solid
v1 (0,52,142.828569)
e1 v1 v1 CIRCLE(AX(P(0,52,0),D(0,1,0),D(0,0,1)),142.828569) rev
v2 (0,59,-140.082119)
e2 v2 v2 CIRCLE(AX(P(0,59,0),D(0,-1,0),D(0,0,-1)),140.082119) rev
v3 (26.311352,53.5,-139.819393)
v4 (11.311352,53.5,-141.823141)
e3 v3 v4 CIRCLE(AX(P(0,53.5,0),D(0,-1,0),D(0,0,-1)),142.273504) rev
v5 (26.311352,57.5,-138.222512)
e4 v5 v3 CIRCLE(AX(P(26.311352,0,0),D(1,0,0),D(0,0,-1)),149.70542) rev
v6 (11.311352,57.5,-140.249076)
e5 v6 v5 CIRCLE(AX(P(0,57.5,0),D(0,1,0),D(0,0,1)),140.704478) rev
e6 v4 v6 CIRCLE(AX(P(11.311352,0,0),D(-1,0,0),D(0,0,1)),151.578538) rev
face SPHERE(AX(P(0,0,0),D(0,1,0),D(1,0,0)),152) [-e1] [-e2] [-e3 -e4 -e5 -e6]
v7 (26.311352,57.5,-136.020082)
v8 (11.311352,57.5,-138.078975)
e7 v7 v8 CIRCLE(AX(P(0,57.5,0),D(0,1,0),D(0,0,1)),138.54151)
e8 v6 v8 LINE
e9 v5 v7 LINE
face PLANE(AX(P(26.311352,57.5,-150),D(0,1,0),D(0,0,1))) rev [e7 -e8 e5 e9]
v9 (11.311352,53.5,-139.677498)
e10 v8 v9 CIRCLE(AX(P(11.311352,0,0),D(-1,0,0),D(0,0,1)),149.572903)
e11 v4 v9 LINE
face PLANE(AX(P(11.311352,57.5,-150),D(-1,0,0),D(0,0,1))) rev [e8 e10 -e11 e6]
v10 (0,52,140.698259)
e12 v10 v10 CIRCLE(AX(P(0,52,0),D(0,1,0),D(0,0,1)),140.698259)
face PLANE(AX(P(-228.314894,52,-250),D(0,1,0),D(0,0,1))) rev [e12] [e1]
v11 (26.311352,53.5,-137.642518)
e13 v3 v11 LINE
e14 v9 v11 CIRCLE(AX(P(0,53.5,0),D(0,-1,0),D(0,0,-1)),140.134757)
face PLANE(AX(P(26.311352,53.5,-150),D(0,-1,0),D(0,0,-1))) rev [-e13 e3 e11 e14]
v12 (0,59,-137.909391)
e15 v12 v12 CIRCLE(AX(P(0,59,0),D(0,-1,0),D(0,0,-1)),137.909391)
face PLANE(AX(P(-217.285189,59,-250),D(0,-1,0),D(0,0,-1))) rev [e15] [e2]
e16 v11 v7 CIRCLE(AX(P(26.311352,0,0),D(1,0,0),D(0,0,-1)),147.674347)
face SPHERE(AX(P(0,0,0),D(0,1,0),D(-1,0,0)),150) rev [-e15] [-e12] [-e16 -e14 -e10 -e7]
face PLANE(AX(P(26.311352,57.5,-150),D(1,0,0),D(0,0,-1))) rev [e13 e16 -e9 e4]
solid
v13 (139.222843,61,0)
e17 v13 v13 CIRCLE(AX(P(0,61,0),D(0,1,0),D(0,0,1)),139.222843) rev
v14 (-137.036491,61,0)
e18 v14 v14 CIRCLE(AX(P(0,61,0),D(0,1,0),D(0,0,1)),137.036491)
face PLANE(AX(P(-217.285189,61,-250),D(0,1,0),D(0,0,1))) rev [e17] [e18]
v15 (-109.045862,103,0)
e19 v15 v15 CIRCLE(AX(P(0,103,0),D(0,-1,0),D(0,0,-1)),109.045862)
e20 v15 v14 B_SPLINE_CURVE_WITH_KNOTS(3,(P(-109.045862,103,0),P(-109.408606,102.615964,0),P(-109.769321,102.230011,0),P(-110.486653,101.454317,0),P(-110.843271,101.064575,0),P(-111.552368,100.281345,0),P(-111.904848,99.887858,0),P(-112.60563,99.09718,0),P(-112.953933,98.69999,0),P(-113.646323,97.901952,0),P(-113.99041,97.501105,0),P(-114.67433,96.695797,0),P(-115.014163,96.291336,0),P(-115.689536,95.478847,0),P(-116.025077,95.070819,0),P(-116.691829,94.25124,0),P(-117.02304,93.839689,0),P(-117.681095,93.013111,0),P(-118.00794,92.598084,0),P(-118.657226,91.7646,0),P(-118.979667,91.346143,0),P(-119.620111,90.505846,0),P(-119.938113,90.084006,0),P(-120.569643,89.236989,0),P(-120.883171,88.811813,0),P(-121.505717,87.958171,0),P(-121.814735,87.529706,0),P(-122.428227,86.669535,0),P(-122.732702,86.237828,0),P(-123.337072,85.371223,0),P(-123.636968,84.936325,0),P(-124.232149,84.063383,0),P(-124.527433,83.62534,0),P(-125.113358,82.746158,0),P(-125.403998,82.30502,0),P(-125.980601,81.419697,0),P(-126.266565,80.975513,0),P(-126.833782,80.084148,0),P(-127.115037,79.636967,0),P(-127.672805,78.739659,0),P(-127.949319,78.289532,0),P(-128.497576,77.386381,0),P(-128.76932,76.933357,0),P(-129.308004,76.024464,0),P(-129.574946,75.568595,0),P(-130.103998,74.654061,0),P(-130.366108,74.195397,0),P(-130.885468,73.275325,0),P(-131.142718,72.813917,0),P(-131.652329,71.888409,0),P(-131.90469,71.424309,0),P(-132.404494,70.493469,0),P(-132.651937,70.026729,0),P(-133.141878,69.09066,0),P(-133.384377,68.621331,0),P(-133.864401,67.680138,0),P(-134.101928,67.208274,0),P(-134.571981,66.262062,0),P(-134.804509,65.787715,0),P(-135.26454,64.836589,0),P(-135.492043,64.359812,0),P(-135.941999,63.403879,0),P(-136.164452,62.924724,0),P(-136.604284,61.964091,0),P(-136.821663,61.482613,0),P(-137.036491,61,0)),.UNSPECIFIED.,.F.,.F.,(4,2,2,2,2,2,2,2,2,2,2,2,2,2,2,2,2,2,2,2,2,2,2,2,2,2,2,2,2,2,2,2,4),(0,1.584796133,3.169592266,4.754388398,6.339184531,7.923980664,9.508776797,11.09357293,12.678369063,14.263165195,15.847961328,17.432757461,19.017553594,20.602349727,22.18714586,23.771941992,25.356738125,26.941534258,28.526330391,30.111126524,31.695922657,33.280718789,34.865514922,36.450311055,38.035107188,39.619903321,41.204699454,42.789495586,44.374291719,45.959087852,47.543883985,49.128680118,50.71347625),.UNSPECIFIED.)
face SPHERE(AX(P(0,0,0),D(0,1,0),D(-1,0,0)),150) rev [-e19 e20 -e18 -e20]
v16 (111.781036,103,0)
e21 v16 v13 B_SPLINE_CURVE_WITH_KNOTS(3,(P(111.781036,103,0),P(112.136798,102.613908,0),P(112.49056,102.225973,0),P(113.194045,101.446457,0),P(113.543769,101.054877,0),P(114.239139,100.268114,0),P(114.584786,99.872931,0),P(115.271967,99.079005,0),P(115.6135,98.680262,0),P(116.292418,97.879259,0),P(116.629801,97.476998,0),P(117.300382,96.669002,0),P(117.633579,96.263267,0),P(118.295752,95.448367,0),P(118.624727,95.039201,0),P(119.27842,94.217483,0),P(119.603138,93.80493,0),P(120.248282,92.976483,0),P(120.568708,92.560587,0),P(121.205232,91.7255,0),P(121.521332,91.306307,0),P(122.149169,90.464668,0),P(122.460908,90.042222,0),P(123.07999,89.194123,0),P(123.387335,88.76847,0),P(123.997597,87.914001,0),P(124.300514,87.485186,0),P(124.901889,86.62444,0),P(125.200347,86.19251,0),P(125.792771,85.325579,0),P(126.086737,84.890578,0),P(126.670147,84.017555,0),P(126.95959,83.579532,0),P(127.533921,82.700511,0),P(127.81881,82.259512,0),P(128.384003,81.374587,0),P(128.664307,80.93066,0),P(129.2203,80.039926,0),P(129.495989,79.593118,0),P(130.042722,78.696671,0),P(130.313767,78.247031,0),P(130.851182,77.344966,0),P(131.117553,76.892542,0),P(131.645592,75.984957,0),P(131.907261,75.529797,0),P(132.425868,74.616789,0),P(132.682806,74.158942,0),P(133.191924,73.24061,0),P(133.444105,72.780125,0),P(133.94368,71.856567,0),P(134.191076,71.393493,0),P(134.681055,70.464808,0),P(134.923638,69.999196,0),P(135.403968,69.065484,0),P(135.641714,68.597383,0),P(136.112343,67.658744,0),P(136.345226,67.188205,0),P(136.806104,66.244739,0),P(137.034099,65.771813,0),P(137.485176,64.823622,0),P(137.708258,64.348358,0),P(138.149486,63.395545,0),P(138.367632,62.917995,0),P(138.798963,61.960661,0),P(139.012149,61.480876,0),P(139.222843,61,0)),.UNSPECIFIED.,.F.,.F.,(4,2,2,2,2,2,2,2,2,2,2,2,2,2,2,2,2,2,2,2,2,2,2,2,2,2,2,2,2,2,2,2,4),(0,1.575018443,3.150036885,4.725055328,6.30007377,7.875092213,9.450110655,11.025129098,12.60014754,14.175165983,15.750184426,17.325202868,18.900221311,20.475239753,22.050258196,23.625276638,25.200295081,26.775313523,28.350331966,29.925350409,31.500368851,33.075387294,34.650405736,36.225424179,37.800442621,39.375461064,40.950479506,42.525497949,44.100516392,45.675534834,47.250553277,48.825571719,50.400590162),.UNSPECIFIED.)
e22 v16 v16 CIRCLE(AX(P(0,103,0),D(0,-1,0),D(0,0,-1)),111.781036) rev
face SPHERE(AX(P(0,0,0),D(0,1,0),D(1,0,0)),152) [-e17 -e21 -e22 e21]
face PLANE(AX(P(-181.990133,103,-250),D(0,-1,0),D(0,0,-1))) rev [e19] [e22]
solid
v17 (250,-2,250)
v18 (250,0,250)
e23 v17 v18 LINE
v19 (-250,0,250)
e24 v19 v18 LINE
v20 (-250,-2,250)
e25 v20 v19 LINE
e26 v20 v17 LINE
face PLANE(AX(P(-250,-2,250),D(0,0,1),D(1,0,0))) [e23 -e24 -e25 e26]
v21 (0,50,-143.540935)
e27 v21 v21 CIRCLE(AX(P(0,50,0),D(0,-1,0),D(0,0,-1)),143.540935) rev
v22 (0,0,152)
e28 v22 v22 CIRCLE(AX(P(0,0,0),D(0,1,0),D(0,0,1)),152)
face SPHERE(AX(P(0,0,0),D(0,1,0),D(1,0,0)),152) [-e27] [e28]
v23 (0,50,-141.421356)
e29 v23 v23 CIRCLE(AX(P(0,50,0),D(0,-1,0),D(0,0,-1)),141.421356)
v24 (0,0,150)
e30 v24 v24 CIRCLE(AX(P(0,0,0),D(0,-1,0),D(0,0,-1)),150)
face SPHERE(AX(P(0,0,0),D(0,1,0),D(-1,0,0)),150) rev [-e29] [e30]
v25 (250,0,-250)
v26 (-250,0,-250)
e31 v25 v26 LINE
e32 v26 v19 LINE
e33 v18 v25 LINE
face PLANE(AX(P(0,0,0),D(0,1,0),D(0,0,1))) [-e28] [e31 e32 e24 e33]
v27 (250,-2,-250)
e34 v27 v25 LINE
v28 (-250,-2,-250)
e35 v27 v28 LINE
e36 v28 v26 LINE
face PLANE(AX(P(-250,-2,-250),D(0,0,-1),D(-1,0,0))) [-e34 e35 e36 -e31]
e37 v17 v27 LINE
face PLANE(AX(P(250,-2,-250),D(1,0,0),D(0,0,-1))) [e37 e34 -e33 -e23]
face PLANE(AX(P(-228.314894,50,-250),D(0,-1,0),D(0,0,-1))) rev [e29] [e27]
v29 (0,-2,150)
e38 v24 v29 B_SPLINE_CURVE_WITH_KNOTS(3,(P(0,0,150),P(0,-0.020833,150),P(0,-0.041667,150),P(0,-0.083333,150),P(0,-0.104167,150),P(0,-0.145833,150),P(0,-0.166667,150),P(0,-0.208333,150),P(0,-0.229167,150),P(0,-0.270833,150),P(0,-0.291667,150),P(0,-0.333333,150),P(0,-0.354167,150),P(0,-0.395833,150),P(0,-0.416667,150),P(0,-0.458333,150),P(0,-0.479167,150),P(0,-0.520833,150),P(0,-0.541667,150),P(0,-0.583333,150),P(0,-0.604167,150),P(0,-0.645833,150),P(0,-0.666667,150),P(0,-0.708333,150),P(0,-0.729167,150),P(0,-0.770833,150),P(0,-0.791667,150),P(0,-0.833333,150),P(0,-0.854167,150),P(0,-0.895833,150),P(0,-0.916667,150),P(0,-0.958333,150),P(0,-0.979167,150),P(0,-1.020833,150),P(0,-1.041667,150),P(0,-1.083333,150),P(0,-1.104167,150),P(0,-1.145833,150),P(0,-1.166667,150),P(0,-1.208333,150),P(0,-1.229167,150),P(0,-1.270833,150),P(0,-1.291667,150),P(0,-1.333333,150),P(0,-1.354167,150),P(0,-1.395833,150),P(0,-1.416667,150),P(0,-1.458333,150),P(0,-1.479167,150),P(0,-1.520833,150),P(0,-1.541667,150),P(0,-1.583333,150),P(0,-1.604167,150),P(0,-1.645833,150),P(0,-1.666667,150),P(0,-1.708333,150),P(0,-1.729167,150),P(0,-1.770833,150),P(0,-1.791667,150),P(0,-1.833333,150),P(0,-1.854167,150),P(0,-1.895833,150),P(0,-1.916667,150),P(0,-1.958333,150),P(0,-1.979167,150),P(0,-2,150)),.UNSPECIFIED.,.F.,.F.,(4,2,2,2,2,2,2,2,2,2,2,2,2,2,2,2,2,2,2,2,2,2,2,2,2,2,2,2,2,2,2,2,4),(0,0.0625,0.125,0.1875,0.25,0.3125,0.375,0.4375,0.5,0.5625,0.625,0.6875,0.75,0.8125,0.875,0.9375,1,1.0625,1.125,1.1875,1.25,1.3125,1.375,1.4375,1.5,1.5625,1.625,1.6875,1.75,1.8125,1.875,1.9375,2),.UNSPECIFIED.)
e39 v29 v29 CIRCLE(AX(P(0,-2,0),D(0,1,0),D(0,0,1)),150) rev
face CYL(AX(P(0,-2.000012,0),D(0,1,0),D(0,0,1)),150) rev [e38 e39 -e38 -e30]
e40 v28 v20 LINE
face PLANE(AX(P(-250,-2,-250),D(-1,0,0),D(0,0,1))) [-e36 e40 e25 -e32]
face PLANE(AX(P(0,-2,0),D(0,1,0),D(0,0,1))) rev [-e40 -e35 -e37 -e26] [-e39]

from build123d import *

# Parameters (mm, degrees)
SKETCH1_W               = 500
SKETCH1_H               = 500
BASE_FLANGE1_DEPTH      = 2
CUT_EXTRUDE1_DEPTH      = 385.84282506
CUT_EXTRUDE1_DEPTH_BACK = 385.84282506
SKETCH8_W               = 401.481262669
SKETCH8_H               = 2
SKETCH8_W_2             = 494.130784823
CUT_EXTRUDE2_DEPTH      = 386.637135141
CUT_EXTRUDE2_DEPTH_BACK = 2
SKETCH15_R              = 150
CUT_EXTRUDE3_DEPTH      = 385.84282506
CUT_EXTRUDE3_DEPTH_BACK = 385.84282506
SKETCH16_W              = 352.950560588
SKETCH16_H              = 50
SKETCH17_W              = 15
SKETCH17_H              = 4
CUT_EXTRUDE5_DEPTH      = 150


# Sheet-metal steps are written as plain solids
with BuildPart() as part:
    # Sketch1 → Base-Flange1 (new body)
    with BuildSketch(Plane(origin=(0, 0, 0), x_dir=(1, 0, 0), z_dir=(0, 1, 0))):
        Rectangle(SKETCH1_W, SKETCH1_H)
    extrude(amount=-BASE_FLANGE1_DEPTH)

    # Sketch7 → Revolve1 (revolve)
    with BuildSketch(Plane.XY, mode=Mode.PRIVATE) as revolve1_sk:
        with BuildLine():
            Line((0, 152), (0, 150))
            ThreePointArc((0, 150), (-106.066017178, 106.066017178), (-150, 0))
            Line((-150, 0), (-152, 0))
            ThreePointArc((-152, 0), (-107.48023074, 107.48023074), (0, 152))
        make_face()
    revolve(revolve1_sk.sketch.rotate(Axis((0, 194.50152145, 0), (0, -1, 0)), 180), axis=Axis((0, 194.50152145, 0), (0, -1, 0)))

    # Sketch8 → Cut-Extrude1 (cut, two sides: drawn at the far end of the back side and taken through both)
    with BuildSketch(Plane.XY.offset(-CUT_EXTRUDE1_DEPTH_BACK)):
        with Locations((-16.544557528, 60)):
            Rectangle(SKETCH8_W, SKETCH8_H)
        with Locations((18.750498531, 51)):
            Rectangle(SKETCH8_W_2, SKETCH8_H)
    extrude(amount=CUT_EXTRUDE1_DEPTH + CUT_EXTRUDE1_DEPTH_BACK, mode=Mode.SUBTRACT)


with BuildPart() as cut_extrude1_piece_1:
    # of the separate pieces the step leaves, piece 1, a body of its own (cut_extrude1_pieces)
    add(part.part.solids().sort_by_distance((-250, 0, -250))[0])

    # Sketch15 → Cut-Extrude2 (cut, two sides: drawn at the far end of the back side and taken through both)
    with BuildSketch(Plane.XZ.offset(2).offset(-CUT_EXTRUDE2_DEPTH_BACK)):
        with Locations(Location((0, 0, 0), (0, 0, 90))):
            Circle(SKETCH15_R)
    extrude(amount=CUT_EXTRUDE2_DEPTH + CUT_EXTRUDE2_DEPTH_BACK, mode=Mode.SUBTRACT)


with BuildPart() as cut_extrude1_piece_2:
    # of the separate pieces the step leaves, piece 2, a body of its own (cut_extrude1_pieces)
    add(part.part.solids().sort_by_distance((139.222842953, 61, 0))[0])

    # Sketch16 → Cut-Extrude3 (cut, two sides: drawn at the far end of the back side and taken through both)
    with BuildSketch(Plane.XY.offset(-CUT_EXTRUDE3_DEPTH_BACK)):
        with Locations((-5.514852509, 128)):
            Rectangle(SKETCH16_W, SKETCH16_H)
    extrude(amount=CUT_EXTRUDE3_DEPTH + CUT_EXTRUDE3_DEPTH_BACK, mode=Mode.SUBTRACT)


with BuildPart() as cut_extrude1_piece_3:
    # of the separate pieces the step leaves, piece 3, a body of its own (cut_extrude1_pieces)
    add(part.part.solids().sort_by_distance((142.828568571, 52, 0))[0])

    # Sketch17 → Cut-Extrude5 (cut)
    with BuildSketch(Plane.XY):
        with Locations((18.811352245, 55.5)):
            Rectangle(SKETCH17_W, SKETCH17_H)
    extrude(amount=-CUT_EXTRUDE5_DEPTH, mode=Mode.SUBTRACT)


solid = Compound([cut_extrude1_piece_1.part, cut_extrude1_piece_2.part, cut_extrude1_piece_3.part])
